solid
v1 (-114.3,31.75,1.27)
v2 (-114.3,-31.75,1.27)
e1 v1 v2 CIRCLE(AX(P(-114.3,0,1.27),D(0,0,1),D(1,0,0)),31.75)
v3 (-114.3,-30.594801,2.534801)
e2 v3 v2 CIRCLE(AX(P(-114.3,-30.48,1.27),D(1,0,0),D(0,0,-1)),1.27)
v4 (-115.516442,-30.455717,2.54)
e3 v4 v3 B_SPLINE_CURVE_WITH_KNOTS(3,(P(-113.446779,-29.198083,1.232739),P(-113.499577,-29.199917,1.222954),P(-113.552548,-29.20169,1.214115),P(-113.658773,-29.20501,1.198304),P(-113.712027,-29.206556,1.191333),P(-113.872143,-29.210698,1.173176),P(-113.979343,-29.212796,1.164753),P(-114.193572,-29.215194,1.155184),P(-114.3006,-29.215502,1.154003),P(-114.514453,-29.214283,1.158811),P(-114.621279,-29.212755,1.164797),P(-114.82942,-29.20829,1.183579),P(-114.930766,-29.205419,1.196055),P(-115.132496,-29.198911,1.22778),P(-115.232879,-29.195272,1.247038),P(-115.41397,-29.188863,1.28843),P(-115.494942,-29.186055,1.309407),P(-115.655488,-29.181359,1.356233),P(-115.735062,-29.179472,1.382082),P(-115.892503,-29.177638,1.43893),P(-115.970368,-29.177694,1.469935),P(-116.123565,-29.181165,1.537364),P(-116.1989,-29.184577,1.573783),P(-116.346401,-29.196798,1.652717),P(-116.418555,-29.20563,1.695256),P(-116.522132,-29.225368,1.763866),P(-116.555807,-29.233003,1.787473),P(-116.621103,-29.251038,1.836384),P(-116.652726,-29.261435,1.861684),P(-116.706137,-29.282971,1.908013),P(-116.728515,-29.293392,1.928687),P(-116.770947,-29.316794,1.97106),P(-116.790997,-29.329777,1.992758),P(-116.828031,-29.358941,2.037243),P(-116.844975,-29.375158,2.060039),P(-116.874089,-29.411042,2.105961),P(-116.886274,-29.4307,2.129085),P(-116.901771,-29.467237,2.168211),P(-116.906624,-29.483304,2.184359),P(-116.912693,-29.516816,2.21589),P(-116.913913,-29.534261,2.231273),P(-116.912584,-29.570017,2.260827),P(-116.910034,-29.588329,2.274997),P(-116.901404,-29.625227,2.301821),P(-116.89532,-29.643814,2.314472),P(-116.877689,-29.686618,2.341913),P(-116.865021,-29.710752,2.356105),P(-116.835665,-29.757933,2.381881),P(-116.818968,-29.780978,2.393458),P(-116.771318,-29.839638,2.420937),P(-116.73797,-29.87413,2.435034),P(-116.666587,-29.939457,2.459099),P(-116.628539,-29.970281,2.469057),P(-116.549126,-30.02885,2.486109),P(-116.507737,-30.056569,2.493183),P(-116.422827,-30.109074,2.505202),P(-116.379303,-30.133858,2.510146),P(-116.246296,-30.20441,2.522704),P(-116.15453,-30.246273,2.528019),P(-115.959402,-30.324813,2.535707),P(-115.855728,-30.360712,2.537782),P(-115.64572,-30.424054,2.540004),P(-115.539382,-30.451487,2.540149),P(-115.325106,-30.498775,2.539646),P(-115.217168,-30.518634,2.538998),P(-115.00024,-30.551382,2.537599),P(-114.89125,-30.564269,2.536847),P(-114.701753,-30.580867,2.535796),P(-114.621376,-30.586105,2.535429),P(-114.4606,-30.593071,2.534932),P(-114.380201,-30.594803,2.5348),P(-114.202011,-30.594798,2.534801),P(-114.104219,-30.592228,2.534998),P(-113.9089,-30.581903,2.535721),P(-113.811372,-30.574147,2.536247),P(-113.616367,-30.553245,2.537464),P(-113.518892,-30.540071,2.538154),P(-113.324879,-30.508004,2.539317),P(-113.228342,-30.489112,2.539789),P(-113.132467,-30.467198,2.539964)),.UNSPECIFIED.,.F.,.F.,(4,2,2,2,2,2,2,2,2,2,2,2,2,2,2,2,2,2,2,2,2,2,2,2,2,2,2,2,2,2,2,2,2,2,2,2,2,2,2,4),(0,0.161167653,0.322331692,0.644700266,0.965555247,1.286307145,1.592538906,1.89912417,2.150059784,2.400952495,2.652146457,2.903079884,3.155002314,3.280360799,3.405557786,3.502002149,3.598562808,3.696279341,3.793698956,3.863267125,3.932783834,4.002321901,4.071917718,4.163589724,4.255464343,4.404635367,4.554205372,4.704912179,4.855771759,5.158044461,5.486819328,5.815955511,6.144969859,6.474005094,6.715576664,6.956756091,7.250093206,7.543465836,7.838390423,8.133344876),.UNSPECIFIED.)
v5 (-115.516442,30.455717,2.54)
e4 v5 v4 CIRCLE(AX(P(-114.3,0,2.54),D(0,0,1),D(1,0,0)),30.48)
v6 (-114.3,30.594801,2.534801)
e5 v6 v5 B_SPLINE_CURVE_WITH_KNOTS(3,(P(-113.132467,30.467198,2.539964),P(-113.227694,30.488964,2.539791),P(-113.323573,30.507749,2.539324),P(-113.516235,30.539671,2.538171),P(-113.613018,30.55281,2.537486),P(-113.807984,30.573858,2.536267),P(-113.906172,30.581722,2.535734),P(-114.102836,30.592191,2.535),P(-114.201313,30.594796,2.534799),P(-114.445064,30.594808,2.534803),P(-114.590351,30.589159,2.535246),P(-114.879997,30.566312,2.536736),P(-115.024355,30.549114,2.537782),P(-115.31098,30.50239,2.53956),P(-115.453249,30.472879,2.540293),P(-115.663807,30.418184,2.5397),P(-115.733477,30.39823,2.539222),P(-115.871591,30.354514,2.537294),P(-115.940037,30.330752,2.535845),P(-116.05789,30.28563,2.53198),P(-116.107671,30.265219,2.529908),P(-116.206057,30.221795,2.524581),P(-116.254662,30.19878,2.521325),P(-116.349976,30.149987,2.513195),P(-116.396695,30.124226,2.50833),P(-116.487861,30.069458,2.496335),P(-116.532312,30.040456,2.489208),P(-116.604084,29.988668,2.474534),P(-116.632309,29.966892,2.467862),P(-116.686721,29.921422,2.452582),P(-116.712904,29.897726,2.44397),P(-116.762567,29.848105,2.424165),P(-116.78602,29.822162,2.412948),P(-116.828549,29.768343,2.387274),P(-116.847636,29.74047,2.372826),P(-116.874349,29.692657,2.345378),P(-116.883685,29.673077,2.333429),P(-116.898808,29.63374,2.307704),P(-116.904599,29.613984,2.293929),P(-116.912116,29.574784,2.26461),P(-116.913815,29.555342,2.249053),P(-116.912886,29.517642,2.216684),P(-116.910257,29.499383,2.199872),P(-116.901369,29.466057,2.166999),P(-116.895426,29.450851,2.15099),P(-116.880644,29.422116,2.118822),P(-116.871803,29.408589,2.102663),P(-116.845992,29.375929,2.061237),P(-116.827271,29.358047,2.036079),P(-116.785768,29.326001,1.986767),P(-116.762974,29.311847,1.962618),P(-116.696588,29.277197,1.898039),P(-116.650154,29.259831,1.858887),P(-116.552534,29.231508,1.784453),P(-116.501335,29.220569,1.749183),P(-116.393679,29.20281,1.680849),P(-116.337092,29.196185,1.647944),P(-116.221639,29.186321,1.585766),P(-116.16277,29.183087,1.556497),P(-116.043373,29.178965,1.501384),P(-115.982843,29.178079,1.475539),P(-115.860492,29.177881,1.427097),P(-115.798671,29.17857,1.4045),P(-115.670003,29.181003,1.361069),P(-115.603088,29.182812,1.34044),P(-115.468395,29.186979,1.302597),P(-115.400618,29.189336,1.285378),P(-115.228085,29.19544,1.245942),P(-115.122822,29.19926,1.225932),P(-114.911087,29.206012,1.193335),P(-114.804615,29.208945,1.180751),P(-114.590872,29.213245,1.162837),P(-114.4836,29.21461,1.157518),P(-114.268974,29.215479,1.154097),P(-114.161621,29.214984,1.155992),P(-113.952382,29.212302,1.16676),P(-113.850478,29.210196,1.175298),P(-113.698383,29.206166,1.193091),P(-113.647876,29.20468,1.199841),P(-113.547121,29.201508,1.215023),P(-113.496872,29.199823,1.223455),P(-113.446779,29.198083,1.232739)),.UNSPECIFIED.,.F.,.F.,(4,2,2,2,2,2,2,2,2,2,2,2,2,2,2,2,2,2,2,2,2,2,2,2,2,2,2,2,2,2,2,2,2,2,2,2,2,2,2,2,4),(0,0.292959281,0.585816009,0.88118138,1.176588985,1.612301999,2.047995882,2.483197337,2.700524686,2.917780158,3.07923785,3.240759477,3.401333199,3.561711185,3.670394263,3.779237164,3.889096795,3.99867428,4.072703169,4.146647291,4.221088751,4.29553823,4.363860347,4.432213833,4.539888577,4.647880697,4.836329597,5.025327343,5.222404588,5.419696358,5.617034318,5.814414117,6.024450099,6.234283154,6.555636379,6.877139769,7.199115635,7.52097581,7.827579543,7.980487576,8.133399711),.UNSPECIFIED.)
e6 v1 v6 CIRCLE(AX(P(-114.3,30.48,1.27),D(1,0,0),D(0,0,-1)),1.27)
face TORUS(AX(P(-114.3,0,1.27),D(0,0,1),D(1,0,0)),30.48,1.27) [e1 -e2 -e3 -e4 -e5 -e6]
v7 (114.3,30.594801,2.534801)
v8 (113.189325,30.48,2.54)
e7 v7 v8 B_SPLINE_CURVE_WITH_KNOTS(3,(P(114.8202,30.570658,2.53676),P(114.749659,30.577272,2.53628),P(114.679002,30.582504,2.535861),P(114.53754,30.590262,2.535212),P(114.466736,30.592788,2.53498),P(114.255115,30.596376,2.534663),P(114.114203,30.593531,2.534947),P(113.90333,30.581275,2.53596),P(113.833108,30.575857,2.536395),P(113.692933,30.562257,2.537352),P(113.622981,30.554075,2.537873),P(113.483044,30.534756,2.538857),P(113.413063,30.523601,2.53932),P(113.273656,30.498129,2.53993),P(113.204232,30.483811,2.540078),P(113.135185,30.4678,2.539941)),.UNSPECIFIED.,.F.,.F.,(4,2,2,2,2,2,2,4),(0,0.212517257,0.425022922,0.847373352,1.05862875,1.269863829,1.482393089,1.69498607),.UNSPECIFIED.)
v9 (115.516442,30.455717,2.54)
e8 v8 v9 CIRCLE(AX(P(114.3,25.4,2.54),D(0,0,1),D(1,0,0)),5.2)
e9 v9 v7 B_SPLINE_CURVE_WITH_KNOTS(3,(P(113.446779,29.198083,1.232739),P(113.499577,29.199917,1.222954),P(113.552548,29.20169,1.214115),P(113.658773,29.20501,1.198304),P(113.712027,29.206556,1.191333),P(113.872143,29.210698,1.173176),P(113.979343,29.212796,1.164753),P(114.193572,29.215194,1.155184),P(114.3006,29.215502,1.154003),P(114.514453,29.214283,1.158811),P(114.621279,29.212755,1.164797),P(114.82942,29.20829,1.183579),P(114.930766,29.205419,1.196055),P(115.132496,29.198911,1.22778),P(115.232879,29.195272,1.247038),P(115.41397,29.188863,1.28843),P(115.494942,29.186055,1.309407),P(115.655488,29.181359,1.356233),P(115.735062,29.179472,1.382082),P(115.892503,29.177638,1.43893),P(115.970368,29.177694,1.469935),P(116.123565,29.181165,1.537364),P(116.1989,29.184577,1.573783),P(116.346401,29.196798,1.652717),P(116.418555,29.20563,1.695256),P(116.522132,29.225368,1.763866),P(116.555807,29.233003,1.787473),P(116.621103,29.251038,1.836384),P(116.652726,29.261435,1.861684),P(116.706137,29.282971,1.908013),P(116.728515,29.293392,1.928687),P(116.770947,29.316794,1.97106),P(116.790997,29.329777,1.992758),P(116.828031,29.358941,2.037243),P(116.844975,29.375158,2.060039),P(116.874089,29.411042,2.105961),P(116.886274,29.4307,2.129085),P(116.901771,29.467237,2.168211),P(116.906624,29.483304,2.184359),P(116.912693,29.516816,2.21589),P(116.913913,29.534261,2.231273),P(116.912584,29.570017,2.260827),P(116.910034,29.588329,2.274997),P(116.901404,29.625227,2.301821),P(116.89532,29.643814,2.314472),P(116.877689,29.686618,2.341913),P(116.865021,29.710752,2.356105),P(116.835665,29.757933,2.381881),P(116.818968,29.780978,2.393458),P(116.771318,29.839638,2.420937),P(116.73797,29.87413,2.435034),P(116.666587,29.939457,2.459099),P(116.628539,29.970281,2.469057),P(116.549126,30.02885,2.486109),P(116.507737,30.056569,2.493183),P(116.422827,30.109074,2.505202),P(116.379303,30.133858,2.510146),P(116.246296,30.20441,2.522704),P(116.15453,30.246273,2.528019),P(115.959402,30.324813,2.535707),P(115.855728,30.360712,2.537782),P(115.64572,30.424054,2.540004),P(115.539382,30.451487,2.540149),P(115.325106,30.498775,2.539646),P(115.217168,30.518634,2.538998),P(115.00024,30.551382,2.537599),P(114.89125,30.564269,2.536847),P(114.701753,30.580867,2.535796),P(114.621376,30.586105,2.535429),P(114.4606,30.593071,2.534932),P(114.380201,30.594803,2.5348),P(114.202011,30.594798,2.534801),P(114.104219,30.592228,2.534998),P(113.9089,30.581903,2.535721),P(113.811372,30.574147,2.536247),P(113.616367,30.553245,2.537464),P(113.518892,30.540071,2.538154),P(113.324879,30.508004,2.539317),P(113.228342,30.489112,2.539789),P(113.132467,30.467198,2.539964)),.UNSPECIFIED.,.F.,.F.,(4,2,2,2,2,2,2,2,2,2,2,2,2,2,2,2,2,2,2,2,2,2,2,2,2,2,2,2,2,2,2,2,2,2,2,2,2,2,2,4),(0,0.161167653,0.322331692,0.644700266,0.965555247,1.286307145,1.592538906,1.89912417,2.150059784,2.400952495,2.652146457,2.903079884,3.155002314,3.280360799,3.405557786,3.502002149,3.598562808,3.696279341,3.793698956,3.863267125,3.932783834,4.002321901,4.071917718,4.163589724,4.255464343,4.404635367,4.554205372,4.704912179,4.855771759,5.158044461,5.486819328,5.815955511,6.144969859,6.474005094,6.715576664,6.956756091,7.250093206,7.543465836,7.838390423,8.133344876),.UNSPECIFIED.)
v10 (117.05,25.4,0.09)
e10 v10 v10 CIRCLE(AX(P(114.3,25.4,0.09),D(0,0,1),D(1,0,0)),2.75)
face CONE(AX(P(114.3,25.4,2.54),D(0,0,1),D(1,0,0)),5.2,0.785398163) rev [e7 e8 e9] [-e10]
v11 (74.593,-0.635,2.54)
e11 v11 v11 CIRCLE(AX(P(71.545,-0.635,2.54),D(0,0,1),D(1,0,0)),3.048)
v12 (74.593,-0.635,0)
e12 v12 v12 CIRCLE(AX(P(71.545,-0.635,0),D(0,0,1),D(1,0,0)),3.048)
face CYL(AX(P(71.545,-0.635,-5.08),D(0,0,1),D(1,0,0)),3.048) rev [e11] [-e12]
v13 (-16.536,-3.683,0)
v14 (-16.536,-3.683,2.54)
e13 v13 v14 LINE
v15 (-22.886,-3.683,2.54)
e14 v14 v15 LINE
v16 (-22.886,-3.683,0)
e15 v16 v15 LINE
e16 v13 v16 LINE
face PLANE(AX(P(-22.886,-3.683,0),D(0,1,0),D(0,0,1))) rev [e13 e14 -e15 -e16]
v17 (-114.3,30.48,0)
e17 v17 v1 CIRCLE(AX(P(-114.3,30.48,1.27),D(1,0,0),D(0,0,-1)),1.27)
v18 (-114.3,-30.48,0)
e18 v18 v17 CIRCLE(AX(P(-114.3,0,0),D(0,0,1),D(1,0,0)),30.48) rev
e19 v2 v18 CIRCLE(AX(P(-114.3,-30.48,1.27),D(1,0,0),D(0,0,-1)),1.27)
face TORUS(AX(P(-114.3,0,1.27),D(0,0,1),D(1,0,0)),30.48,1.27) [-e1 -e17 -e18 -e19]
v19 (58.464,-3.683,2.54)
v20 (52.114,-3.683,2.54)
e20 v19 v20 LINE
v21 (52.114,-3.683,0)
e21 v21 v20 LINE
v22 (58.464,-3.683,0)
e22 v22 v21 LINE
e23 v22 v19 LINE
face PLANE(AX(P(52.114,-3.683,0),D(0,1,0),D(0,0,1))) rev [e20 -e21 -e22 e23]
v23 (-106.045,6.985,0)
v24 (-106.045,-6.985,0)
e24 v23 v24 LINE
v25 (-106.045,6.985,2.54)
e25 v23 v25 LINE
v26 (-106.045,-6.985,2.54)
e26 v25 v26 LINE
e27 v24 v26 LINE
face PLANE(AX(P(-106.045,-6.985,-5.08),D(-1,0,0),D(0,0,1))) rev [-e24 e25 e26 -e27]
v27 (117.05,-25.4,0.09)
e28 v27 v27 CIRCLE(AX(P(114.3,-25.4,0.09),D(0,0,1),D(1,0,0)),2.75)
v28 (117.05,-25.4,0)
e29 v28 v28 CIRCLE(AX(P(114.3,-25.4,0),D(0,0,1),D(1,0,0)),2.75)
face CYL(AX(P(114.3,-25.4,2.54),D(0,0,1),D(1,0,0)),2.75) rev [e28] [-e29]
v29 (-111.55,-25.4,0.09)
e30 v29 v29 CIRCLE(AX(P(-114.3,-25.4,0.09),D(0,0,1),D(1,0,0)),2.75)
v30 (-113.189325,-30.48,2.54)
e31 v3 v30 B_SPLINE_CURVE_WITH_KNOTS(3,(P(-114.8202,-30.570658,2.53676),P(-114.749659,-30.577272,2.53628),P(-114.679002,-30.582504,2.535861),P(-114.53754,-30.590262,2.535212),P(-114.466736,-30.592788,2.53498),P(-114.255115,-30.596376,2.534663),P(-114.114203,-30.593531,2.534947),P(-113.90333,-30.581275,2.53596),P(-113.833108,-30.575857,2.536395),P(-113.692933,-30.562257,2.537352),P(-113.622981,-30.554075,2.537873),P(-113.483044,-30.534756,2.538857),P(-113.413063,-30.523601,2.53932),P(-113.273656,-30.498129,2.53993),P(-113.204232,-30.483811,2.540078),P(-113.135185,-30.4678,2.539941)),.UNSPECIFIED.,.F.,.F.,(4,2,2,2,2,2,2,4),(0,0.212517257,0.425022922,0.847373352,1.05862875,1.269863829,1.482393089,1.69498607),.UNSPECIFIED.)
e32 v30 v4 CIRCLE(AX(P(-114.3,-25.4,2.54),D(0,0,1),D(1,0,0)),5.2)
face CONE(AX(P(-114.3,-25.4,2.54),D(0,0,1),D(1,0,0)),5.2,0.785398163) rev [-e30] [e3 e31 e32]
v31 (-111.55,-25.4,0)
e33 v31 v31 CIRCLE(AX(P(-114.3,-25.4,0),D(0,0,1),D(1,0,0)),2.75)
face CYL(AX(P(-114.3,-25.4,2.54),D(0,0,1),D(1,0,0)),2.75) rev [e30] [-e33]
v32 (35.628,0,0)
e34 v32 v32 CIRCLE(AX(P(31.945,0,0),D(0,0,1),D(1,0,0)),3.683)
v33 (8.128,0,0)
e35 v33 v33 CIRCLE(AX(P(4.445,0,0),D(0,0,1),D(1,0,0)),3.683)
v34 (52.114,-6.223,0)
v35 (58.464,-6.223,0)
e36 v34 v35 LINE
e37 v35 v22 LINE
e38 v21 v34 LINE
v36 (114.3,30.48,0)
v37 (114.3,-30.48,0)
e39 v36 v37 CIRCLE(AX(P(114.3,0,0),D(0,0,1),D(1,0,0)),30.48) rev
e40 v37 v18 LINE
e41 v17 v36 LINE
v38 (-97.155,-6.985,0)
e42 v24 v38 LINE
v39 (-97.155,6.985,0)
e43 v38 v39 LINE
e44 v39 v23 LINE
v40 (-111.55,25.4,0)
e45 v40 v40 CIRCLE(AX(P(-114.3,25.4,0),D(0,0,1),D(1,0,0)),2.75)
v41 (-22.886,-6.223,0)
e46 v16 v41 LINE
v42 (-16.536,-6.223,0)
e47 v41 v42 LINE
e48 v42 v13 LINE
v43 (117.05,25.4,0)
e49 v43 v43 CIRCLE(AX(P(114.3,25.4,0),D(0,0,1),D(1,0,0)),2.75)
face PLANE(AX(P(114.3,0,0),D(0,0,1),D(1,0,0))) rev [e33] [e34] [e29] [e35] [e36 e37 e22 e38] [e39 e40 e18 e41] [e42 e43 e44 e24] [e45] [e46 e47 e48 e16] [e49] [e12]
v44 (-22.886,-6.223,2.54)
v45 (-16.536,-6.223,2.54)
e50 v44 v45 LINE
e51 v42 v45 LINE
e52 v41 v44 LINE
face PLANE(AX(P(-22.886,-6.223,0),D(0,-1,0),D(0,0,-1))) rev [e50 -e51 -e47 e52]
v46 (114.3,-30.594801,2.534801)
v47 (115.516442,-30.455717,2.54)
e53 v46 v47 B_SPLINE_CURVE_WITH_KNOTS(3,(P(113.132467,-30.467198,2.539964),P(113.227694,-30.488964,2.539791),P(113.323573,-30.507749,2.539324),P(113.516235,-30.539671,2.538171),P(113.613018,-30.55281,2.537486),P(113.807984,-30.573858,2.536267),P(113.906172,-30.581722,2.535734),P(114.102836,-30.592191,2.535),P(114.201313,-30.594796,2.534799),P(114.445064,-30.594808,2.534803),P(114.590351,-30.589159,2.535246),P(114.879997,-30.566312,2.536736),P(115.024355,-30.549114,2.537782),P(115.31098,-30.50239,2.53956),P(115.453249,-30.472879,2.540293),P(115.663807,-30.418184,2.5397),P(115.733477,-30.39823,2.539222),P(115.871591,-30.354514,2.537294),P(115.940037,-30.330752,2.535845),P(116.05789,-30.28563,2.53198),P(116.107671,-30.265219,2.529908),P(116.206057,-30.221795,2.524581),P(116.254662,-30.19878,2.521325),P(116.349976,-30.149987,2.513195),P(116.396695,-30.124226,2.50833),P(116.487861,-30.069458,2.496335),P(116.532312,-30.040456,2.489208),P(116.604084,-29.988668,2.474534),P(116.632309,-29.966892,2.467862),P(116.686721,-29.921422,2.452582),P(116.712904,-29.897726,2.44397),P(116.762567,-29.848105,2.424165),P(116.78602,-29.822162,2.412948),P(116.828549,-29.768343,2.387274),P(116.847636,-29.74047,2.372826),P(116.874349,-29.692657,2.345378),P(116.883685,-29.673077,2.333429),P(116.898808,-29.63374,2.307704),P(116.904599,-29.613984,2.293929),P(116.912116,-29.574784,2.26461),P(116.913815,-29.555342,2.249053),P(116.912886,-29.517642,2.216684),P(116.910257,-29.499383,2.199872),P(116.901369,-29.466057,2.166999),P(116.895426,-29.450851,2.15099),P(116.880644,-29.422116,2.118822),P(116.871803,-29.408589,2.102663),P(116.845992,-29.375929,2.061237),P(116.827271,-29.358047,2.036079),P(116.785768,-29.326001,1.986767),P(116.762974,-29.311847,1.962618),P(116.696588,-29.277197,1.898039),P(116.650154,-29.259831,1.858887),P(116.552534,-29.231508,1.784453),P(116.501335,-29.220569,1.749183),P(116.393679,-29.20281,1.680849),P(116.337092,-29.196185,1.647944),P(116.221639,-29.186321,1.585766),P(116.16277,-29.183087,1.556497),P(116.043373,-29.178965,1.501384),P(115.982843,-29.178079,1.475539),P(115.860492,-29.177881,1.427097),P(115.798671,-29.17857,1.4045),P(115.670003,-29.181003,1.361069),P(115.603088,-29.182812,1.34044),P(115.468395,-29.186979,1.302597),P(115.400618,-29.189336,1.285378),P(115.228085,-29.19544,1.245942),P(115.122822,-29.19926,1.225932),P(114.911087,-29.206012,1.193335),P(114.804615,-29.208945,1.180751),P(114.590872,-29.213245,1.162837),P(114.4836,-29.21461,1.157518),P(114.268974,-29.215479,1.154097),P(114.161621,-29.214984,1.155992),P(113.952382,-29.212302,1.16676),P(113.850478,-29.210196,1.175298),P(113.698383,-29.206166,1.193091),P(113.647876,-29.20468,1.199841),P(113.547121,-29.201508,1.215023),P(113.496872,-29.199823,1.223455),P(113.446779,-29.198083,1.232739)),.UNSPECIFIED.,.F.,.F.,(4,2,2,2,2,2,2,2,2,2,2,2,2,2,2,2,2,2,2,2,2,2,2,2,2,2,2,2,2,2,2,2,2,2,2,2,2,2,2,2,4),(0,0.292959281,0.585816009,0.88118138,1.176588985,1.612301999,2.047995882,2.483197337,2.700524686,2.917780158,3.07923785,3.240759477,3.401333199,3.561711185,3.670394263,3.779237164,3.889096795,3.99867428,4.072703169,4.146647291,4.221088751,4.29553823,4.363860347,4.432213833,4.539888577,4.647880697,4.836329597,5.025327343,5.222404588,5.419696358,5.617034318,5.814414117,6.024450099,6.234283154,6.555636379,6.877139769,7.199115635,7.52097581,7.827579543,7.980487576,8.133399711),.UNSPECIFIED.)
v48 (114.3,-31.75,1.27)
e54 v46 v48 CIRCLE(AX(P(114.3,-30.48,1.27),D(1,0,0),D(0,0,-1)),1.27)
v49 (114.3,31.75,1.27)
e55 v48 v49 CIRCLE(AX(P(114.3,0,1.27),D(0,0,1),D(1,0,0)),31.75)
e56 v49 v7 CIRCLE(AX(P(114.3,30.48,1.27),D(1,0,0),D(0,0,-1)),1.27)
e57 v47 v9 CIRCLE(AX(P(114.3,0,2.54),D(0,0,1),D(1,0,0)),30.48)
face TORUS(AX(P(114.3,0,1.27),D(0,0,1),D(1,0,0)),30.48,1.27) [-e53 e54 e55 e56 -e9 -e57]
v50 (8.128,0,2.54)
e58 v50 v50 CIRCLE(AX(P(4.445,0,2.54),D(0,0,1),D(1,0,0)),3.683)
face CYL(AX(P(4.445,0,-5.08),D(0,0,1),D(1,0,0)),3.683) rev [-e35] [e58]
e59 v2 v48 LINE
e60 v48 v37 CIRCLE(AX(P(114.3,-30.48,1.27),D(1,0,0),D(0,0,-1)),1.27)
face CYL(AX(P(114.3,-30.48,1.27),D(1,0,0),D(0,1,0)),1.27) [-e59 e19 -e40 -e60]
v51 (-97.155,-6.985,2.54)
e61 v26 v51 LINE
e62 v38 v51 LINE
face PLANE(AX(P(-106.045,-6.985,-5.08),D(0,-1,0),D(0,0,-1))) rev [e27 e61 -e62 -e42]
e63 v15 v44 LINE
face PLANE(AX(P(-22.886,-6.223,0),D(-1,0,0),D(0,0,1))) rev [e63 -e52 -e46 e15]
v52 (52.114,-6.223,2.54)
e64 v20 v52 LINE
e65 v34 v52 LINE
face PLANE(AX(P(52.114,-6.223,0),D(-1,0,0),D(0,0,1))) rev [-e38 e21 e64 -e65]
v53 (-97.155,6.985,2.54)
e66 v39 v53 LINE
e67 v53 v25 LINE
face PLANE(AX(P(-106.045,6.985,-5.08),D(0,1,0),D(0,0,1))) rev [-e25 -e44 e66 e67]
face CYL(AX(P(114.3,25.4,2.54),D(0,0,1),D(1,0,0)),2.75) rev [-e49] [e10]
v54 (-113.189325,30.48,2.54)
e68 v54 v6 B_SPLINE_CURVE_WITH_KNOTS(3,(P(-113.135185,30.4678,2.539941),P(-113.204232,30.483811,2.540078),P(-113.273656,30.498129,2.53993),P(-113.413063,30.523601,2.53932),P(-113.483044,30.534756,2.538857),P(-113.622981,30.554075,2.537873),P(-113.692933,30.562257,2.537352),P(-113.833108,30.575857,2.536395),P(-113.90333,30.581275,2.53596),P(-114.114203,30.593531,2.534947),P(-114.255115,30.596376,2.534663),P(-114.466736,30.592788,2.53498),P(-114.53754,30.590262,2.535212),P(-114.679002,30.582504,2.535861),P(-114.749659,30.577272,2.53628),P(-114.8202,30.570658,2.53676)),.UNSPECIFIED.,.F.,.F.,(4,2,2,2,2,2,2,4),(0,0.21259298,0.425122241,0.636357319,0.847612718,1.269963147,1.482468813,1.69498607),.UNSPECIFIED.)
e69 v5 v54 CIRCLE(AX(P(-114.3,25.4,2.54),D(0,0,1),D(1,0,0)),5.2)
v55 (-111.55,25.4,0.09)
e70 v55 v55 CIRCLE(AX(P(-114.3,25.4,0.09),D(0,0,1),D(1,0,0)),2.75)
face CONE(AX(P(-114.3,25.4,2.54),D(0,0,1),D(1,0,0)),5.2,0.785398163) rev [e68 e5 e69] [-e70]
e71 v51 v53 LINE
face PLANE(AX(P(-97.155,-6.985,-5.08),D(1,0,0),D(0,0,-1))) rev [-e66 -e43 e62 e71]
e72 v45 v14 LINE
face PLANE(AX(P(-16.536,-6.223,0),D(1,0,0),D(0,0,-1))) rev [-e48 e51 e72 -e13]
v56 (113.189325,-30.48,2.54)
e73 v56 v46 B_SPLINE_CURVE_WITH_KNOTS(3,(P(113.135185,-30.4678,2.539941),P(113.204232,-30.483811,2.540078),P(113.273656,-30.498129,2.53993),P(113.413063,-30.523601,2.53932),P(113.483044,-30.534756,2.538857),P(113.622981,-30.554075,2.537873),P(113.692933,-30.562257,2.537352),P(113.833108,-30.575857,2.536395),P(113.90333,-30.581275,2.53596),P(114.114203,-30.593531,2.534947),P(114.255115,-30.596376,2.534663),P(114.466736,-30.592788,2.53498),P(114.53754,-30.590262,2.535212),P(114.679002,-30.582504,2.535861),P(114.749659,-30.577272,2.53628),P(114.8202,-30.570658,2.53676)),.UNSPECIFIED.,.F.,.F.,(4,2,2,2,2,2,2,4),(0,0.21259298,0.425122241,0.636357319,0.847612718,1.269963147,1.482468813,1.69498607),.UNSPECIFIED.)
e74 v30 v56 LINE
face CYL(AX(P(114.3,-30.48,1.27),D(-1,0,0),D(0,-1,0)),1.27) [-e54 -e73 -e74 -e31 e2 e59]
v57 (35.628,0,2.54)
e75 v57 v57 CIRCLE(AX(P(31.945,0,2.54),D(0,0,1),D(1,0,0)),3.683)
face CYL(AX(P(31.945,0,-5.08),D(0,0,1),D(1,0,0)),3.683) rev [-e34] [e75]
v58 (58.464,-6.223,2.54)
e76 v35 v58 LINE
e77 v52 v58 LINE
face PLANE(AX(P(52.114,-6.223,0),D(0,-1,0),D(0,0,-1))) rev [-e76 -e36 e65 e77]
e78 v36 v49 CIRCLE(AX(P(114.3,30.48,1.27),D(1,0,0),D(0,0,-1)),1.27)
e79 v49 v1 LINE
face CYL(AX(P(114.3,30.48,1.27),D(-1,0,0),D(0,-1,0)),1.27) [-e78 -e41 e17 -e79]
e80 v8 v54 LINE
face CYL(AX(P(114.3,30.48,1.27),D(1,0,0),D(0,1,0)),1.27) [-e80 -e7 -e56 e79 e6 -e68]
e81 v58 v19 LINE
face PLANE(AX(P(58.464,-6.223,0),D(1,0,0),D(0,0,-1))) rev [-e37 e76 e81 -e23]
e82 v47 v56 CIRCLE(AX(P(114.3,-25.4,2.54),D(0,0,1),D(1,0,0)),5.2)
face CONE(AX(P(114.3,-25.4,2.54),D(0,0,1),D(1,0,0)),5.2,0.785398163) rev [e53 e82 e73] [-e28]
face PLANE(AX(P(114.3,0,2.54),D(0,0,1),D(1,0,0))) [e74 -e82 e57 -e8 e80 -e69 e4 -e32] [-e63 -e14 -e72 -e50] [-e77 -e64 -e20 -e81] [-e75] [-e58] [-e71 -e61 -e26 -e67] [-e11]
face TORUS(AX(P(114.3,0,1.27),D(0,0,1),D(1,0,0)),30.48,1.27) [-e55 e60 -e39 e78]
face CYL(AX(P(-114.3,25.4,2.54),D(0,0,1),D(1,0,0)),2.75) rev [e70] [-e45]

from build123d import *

# Parameters (mm, degrees)
BOSS_EXTRUDE1_DEPTH  = 2.54
SKETCH2_W            = 8.89
SKETCH2_H            = 13.97
CUT_EXTRUDE1_DEPTH   = 7.62
SKETCH3_R            = 3.683
CUT_EXTRUDE2_DEPTH   = 7.62
LPATTERN1_COUNT      = 2
LPATTERN1_PITCH      = 27.5
SKETCH4_R            = 3.048
CUT_EXTRUDE3_DEPTH   = 7.62
SKETCH6_W            = 6.35
SKETCH6_H            = 2.54
CUT_EXTRUDE5_DEPTH   = 2.54
FILLET1_R            = 1.27
LPATTERN4_COUNT      = 2
LPATTERN4_PITCH      = 228.6
LPATTERN4_COUNT_DIR2 = 2
LPATTERN4_PITCH_DIR2 = 50.8
LPATTERN5_COUNT      = 2
LPATTERN5_PITCH      = 75


with BuildPart() as part:
    # Sketch1 → Boss-Extrude1 (new body)
    with BuildSketch(Plane.XY):
        with BuildLine():
            Line((114.3, -31.75), (-114.3, -31.75))
            ThreePointArc((-114.3, -31.75), (-146.05, 0), (-114.3, 31.75))
            Line((-114.3, 31.75), (114.3, 31.75))
            ThreePointArc((114.3, 31.75), (146.05, 0), (114.3, -31.75))
        make_face()
    extrude(amount=BOSS_EXTRUDE1_DEPTH)

    # Sketch2 → Cut-Extrude1 (cut)
    with BuildSketch(Plane.XY.offset(2.54)):
        with Locations((-101.6, 0)):
            Rectangle(SKETCH2_W, SKETCH2_H)
    extrude(amount=-CUT_EXTRUDE1_DEPTH, mode=Mode.SUBTRACT)

    # Sketch3 → Cut-Extrude2 (cut)
    with BuildSketch(Plane.XY.offset(2.54)):
        with Locations((4.445, 0)):
            Circle(SKETCH3_R)
    cut_extrude2 = extrude(amount=-CUT_EXTRUDE2_DEPTH, mode=Mode.SUBTRACT)

    # LPattern1: Cut-Extrude2 ×2
    with Locations(*[(i * LPATTERN1_PITCH, 0, 0) for i in range(1, LPATTERN1_COUNT)]):
        add(cut_extrude2, mode=Mode.SUBTRACT)

    # Sketch4 → Cut-Extrude3 (cut)
    with BuildSketch(Plane.XY.offset(2.54)):
        with Locations((71.545, -0.635)):
            Circle(SKETCH4_R)
    extrude(amount=-CUT_EXTRUDE3_DEPTH, mode=Mode.SUBTRACT)

    # Sketch6 → Cut-Extrude5 (cut)
    with BuildSketch(Plane.XY.offset(2.54)):
        with Locations((55.289, -4.953)):
            Rectangle(SKETCH6_W, SKETCH6_H)
    cut_extrude5 = extrude(amount=-CUT_EXTRUDE5_DEPTH, mode=Mode.SUBTRACT)

    # Fillet1
    fillet1_edges = [part.edges().sort_by_distance(p)[0] for p in [
        (0, -31.75, 2.54),
        (-146.05, 0, 2.54),
        (0, 31.75, 2.54),
        (146.05, 0, 2.54),
        (146.05, 0, 0),
        (0, -31.75, 0),
        (-146.05, 0, 0),
        (0, 31.75, 0),
    ]]
    fillet(fillet1_edges, radius=FILLET1_R - 0.0001)  # a hair under: the kernel refuses the full size

    # Sketch9 → CSK for M5 Flat Head Machine Screw2 (revolve, cut)
    with BuildSketch(Plane(origin=(-114.3, 25.4, 2.54), x_dir=(0, -1, 0), z_dir=(1, 0, 0))):
        Polygon((0, 0), (0, 2.54), (2.75, 2.54), (2.75, 2.45), (5.2, 0), align=None)
    csk_for_m5_flat_head_machine_screw2 = revolve(axis=Axis((-114.3, 25.4, 8.89), (0, 0, -1)), mode=Mode.SUBTRACT)

    # LPattern4: CSK for M5 Flat Head Machine Screw2 2 × 2
    with Locations(*[(i * LPATTERN4_PITCH, -j * LPATTERN4_PITCH_DIR2, 0) for i in range(LPATTERN4_COUNT) for j in range(LPATTERN4_COUNT_DIR2) if (i, j) != (0, 0)]):
        add(csk_for_m5_flat_head_machine_screw2, mode=Mode.SUBTRACT)

    # LPattern5: Cut-Extrude5 ×2
    with Locations(*[(-i * LPATTERN5_PITCH, 0, 0) for i in range(1, LPATTERN5_COUNT)]):
        add(cut_extrude5, mode=Mode.SUBTRACT)


solid = part.part
